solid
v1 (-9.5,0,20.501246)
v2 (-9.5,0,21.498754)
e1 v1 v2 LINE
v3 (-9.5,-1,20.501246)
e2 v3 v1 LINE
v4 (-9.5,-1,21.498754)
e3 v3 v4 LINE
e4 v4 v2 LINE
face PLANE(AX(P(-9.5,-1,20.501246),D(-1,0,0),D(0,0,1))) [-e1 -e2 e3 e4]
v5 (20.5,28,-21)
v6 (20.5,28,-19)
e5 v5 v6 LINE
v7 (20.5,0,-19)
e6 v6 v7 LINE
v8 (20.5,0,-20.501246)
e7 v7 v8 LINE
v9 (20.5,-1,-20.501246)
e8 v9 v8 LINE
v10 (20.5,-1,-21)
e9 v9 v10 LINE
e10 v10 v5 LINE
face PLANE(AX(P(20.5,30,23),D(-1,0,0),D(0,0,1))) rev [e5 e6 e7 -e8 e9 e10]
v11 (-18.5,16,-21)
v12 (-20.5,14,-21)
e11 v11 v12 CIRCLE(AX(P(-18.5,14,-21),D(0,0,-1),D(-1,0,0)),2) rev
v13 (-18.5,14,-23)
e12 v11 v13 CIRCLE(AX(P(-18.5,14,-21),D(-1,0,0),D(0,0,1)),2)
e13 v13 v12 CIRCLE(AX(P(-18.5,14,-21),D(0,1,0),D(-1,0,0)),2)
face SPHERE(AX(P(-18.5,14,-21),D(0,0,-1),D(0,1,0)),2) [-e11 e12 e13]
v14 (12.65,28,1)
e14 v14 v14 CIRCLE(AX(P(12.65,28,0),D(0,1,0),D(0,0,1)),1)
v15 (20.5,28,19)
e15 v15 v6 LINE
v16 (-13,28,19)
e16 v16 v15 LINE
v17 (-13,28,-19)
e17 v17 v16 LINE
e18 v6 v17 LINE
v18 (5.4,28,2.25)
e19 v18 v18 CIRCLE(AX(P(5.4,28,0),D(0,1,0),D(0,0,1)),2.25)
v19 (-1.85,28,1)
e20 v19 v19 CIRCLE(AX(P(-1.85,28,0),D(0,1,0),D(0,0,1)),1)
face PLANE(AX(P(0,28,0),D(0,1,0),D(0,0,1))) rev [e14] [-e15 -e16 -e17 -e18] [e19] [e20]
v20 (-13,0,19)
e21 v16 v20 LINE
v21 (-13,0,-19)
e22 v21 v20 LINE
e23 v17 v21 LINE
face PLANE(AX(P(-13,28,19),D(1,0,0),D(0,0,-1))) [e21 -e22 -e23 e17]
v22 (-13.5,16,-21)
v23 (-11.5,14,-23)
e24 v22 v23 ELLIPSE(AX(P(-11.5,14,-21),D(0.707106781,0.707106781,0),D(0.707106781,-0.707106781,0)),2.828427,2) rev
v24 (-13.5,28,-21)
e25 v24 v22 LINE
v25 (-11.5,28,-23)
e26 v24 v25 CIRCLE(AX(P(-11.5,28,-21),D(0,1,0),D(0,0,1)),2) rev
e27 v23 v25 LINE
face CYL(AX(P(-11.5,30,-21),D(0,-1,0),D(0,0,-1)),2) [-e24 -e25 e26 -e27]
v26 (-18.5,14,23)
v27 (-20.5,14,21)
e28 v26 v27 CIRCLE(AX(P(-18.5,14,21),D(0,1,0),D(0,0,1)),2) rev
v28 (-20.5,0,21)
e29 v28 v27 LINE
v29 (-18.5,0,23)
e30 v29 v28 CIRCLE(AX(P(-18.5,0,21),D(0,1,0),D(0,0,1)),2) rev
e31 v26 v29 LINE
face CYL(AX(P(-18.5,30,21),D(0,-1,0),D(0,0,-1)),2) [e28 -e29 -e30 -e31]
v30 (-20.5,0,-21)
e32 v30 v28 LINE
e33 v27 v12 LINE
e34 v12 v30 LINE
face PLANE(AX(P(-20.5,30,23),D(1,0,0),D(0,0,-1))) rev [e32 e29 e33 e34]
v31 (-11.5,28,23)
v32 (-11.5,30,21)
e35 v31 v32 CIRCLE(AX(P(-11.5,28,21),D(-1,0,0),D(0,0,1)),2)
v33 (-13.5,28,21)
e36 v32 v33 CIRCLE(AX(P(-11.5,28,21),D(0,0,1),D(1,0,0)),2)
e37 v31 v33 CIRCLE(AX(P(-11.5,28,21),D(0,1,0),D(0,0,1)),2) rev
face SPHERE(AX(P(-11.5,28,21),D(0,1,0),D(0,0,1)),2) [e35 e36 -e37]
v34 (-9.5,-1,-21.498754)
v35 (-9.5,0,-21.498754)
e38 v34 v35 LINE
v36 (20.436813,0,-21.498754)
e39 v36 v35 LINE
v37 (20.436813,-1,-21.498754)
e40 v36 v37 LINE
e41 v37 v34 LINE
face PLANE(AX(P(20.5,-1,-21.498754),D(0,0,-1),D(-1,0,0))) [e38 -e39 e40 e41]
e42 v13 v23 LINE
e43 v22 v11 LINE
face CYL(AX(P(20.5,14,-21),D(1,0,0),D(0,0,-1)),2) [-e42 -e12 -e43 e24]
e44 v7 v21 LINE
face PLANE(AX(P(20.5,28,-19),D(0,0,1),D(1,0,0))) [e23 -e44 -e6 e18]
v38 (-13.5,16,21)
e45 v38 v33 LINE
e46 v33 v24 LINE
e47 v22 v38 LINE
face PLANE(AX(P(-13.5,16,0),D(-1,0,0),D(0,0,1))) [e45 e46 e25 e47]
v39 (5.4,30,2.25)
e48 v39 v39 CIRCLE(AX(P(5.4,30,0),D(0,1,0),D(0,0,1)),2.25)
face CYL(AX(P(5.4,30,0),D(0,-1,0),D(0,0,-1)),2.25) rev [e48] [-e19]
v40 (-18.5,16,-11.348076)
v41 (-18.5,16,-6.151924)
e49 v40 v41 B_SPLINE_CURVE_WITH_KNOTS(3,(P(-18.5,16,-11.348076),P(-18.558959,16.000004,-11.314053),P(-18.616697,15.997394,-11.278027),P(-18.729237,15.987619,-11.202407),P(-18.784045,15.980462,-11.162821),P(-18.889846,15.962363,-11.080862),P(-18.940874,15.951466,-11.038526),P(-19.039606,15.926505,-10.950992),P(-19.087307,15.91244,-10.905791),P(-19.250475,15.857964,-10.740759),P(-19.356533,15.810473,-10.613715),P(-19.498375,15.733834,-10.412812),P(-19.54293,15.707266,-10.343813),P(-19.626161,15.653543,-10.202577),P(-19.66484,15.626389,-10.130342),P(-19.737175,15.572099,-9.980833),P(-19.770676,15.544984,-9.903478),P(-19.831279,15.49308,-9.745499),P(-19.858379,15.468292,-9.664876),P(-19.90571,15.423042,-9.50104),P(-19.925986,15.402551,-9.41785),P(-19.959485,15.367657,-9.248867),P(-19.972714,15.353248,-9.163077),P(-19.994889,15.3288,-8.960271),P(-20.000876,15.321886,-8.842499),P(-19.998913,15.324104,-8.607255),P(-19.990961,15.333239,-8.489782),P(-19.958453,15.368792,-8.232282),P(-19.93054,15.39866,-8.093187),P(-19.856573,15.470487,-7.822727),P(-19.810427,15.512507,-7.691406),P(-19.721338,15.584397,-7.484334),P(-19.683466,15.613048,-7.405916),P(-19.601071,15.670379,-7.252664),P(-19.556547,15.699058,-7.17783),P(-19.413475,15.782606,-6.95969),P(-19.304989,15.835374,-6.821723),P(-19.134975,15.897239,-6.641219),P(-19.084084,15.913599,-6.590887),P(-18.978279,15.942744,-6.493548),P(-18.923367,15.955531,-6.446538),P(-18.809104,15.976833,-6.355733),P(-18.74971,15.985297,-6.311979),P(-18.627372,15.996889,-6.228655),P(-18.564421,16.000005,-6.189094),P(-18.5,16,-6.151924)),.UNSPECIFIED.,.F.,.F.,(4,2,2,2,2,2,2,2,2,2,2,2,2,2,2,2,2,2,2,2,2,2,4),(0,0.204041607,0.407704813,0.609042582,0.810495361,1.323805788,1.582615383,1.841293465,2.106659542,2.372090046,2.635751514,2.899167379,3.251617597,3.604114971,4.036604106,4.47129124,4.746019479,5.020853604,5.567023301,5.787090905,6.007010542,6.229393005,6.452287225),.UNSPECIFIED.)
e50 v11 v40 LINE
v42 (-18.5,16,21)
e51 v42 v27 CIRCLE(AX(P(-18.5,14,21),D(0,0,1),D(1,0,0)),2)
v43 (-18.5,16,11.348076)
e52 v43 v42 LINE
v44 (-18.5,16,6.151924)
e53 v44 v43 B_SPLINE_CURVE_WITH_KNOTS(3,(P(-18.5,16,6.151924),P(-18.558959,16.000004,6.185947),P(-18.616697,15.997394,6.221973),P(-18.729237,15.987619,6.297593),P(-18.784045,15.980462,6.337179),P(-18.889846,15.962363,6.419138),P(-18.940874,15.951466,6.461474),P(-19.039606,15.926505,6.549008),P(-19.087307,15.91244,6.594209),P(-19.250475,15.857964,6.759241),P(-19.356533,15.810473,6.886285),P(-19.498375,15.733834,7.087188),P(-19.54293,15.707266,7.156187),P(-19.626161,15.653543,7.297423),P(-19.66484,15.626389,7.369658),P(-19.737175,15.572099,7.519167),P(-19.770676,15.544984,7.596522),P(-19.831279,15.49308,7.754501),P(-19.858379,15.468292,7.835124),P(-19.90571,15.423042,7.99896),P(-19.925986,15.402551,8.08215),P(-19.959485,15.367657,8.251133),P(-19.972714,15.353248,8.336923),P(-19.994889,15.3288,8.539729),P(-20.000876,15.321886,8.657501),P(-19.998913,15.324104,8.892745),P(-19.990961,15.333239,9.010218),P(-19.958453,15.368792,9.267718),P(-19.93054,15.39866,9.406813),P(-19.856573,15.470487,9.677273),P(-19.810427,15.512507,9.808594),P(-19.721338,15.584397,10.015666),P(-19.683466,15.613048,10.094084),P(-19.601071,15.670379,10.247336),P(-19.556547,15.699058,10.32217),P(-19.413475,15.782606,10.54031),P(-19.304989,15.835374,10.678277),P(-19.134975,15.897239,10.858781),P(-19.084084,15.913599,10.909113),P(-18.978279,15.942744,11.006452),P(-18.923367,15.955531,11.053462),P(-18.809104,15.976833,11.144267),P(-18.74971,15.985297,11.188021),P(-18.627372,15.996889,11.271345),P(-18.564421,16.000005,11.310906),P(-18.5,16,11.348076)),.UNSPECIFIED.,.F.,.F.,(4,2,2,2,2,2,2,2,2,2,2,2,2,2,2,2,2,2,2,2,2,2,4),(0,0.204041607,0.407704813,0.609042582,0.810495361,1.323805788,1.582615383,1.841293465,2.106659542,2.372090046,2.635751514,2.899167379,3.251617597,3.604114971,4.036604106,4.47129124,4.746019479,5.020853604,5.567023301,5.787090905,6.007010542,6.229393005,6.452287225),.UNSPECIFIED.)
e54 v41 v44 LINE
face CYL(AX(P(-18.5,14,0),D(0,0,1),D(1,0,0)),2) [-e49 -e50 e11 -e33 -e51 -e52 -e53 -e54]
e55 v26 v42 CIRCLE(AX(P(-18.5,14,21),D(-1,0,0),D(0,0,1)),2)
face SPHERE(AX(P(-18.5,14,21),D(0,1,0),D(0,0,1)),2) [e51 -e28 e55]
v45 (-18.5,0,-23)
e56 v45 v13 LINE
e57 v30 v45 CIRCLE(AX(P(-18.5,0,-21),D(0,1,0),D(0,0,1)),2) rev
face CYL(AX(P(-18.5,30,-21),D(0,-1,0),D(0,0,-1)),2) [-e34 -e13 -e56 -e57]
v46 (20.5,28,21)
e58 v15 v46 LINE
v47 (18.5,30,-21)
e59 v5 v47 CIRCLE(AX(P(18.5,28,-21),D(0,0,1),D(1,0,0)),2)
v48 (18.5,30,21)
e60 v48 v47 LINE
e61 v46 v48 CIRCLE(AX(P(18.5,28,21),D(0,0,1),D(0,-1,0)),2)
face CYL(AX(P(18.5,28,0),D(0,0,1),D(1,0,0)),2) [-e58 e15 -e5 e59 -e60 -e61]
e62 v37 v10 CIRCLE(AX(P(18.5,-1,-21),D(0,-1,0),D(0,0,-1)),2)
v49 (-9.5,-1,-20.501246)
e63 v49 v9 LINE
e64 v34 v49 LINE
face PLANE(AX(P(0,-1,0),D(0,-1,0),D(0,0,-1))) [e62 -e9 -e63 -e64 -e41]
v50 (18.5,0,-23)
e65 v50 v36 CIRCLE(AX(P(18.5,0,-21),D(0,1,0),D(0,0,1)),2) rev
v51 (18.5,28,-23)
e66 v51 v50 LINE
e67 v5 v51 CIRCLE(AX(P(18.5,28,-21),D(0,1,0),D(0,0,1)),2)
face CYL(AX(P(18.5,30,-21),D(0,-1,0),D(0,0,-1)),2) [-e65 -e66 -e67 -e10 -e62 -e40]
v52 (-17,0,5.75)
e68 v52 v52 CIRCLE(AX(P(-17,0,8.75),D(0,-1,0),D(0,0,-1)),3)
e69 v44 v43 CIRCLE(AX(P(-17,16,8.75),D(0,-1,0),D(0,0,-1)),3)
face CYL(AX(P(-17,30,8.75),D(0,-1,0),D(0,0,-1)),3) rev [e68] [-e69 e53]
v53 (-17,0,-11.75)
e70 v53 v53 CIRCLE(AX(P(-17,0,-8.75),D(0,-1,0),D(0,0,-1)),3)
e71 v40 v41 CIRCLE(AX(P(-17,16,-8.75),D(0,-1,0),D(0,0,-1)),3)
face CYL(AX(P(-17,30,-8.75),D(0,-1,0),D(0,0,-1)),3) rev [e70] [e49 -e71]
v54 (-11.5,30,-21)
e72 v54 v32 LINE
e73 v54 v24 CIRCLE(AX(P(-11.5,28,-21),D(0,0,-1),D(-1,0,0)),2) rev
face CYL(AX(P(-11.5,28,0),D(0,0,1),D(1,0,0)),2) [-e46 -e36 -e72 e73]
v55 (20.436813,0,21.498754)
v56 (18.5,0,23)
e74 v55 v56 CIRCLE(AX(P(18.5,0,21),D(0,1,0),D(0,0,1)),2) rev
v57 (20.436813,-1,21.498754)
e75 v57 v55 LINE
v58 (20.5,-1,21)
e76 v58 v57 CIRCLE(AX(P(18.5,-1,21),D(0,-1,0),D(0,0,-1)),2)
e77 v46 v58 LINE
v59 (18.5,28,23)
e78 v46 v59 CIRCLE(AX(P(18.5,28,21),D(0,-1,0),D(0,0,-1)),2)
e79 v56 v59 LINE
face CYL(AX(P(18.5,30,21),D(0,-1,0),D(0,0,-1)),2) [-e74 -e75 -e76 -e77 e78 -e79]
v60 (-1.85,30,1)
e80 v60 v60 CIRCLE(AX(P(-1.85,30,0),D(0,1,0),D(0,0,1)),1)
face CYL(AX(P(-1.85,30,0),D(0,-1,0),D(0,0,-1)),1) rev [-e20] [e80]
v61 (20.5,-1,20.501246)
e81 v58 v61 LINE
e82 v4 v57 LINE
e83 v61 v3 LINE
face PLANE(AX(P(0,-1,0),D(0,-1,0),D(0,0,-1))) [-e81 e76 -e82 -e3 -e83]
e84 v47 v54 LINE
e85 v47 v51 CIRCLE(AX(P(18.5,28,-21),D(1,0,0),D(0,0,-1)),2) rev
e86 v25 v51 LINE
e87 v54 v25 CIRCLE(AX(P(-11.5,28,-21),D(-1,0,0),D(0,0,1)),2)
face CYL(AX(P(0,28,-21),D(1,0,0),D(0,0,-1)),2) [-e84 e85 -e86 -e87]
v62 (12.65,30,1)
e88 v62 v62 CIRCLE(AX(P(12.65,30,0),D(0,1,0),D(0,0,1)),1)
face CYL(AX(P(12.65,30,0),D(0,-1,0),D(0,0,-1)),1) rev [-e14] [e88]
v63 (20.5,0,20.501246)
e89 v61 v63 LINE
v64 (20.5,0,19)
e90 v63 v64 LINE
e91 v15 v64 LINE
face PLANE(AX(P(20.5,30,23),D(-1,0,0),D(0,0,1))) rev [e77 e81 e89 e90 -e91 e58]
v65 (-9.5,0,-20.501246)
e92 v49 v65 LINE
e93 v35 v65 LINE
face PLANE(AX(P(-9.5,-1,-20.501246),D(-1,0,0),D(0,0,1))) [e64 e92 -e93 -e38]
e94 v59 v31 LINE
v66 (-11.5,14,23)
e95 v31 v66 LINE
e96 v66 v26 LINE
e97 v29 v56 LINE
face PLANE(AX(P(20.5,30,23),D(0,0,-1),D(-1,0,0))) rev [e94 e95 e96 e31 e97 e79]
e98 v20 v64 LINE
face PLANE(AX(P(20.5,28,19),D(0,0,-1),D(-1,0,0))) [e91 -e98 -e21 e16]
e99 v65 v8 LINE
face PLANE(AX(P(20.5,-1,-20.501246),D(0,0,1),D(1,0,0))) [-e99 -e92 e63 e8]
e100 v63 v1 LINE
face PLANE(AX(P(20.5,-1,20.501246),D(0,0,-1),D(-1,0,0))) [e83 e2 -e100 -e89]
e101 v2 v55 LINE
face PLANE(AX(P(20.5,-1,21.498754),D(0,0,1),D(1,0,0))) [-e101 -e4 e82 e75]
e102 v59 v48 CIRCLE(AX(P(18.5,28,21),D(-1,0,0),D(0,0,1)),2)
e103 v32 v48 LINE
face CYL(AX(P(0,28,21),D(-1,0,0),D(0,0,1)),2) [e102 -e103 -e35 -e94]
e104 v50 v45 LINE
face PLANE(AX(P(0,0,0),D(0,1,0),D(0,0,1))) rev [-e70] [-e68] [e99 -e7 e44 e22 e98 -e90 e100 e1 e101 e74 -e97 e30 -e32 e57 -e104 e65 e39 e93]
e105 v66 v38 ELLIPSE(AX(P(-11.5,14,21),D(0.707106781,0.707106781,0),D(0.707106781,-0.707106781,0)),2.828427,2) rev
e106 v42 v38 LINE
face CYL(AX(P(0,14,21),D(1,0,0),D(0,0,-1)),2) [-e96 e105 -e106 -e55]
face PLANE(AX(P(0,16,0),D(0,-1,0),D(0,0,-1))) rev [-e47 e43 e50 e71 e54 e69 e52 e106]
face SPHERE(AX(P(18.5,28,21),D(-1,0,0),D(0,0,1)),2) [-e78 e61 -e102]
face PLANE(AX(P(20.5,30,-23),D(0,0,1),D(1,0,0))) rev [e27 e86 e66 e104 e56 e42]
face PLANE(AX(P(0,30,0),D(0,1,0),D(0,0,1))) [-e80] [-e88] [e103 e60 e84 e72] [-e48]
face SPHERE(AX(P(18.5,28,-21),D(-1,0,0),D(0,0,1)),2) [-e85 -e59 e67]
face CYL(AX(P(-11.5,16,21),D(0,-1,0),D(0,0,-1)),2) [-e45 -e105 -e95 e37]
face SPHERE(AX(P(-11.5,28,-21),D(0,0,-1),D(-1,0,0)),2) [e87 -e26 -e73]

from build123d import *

# Parameters (mm, degrees)
ESQUISSE1_W                  = 41
ESQUISSE1_H                  = 46
ESQUISSE1_R                  = 2.25
ESQUISSE1_R_2                = 1
BOSS_EXTRU_1_DEPTH           = 30
ENL_V_START                  = 30
ESQUISSE2_W                  = 7
ESQUISSE2_H                  = 46
ENL_V_MAT_EXTRU_1_DEPTH      = 14
ENL_V_MAT_EXTRU_3_DEPTH      = 28.002906878
ENL_V_MAT_EXTRU_3_DEPTH_BACK = 44.002906878
ENL_V_MAT_EXTRU_3_START      = 16
ESQUISSE2_3_R                = 3
ESQUISSE3_W                  = 33.5
ESQUISSE3_H                  = 38
ENL_V_MAT_EXTRU_4_DEPTH      = 28
ESQUISSE4_W                  = 30
ESQUISSE4_H                  = 0.997507574
BOSS_EXTRU_2_DEPTH           = 1
CONG_1_R                     = 2
CONG_2_R                     = 2


# Some blends are built 0.0001 mm under size
with BuildPart() as part:
    # Esquisse1 → Boss.-Extru.1 (new body)
    with BuildSketch(Plane(origin=(0, 0, 0), x_dir=(1, 0, 0), z_dir=(0, 1, 0))):
        Rectangle(ESQUISSE1_W, ESQUISSE1_H)
        with Locations(Location((5.4, 0, 0), (0, 0, 270))):
            Circle(ESQUISSE1_R, mode=Mode.SUBTRACT)
        with Locations(Location((-1.85, 0, 0), (0, 0, 270))):
            Circle(ESQUISSE1_R_2, mode=Mode.SUBTRACT)
        with Locations(Location((12.65, 0, 0), (0, 0, 270))):
            Circle(ESQUISSE1_R_2, mode=Mode.SUBTRACT)
    extrude(amount=BOSS_EXTRU_1_DEPTH)

    # Esquisse2 → Enlèv. mat.-Extru.1 (cut)
    with BuildSketch(Plane(origin=(0, 0, 0), x_dir=(1, 0, 0), z_dir=(0, 1, 0)).offset(ENL_V_START)):
        with Locations((-17, 0)):
            Rectangle(ESQUISSE2_W, ESQUISSE2_H)
    extrude(amount=-ENL_V_MAT_EXTRU_1_DEPTH, mode=Mode.SUBTRACT)

    # Esquisse2<3> → Enlèv. mat.-Extru.3 (cut, two sides: drawn at the far end of the back side and taken through both)
    with BuildSketch(Plane(origin=(0, 0, 0), x_dir=(1, 0, 0), z_dir=(0, 1, 0)).offset(ENL_V_MAT_EXTRU_3_START - ENL_V_MAT_EXTRU_3_DEPTH_BACK)):
        with Locations(Location((-17, -8.75, 0), (0, 0, 90))):
            Circle(ESQUISSE2_3_R)
        with Locations(Location((-17, 8.75, 0), (0, 0, 90))):
            Circle(ESQUISSE2_3_R)
    extrude(amount=ENL_V_MAT_EXTRU_3_DEPTH + ENL_V_MAT_EXTRU_3_DEPTH_BACK, mode=Mode.SUBTRACT)

    # Esquisse3 → Enlèv. mat.-Extru.4 (cut)
    with BuildSketch(Plane(origin=(0, 0, 0), x_dir=(1, 0, 0), z_dir=(0, 1, 0))):
        with Locations((3.75, 0)):
            Rectangle(ESQUISSE3_W, ESQUISSE3_H)
    extrude(amount=ENL_V_MAT_EXTRU_4_DEPTH, mode=Mode.SUBTRACT)

    # Esquisse4 → Boss.-Extru.2 (add)
    with BuildSketch(Plane(origin=(0, 0, 0), x_dir=(1, 0, 0), z_dir=(0, 1, 0))):
        with Locations((5.5, -21)):
            Rectangle(ESQUISSE4_W, ESQUISSE4_H)
        with Locations((5.5, 21)):
            Rectangle(ESQUISSE4_W, ESQUISSE4_H)
    extrude(amount=-BOSS_EXTRU_2_DEPTH)

    # Congé1
    # the kernel refuses this fillet: 2 mm, written as the material it takes off along each edge
    with BuildSketch(Plane(origin=(-11.5, 28, -21), x_dir=(-1, 0, 0), z_dir=(0, 0, -1))) as cong_1_piece_1_section:
        Polygon((0, 0), (CONG_1_R, 0), (CONG_1_R, CONG_1_R), (0, CONG_1_R), align=None)
    cong_1_piece_1 = extrude(amount=CONG_1_R, mode=Mode.PRIVATE)
    cong_1_piece_1 = cong_1_piece_1 - Plane(origin=(-11.5, 28, -21), x_dir=(0.7071067811865475, -0.7071067811865475, 0), z_dir=(0, 0, -1)) * Sphere(CONG_1_R, mode=Mode.PRIVATE)
    add(cong_1_piece_1, mode=Mode.SUBTRACT)
    with BuildSketch(Plane(origin=(-18.5, 14, -21), x_dir=(0, 1, 0), z_dir=(-1, 0, 0))) as cong_1_piece_2_section:
        Polygon((0, 0), (CONG_1_R, 0), (CONG_1_R, CONG_1_R), (0, CONG_1_R), align=None)
    cong_1_piece_2 = extrude(amount=CONG_1_R, mode=Mode.PRIVATE)
    cong_1_piece_2 = cong_1_piece_2 - Plane(origin=(-18.5, 14, -21), x_dir=(0, -0.7071067811865475, 0.7071067811865475), z_dir=(-1, 0, 0)) * Sphere(CONG_1_R, mode=Mode.PRIVATE)
    add(cong_1_piece_2, mode=Mode.SUBTRACT)
    with BuildSketch(Plane(origin=(-11.5, 28, 21), x_dir=(-1, 0, 0), z_dir=(0, 0, 1))) as cong_1_piece_3_section:
        Polygon((0, 0), (CONG_1_R, 0), (CONG_1_R, -CONG_1_R), (0, -CONG_1_R), align=None)
    cong_1_piece_3 = extrude(amount=CONG_1_R, mode=Mode.PRIVATE)
    cong_1_piece_3 = cong_1_piece_3 - Plane(origin=(-11.5, 28, 21), x_dir=(0.7071067811865475, -0.7071067811865475, 0), z_dir=(0, 0, 1)) * Sphere(CONG_1_R, mode=Mode.PRIVATE)
    add(cong_1_piece_3, mode=Mode.SUBTRACT)
    with BuildSketch(Plane(origin=(-18.5, 14, 21), x_dir=(-1, 0, 0), z_dir=(0, 0, 1))) as cong_1_piece_4_section:
        Polygon((0, 0), (CONG_1_R, 0), (CONG_1_R, -CONG_1_R), (0, -CONG_1_R), align=None)
    cong_1_piece_4 = extrude(amount=CONG_1_R, mode=Mode.PRIVATE)
    cong_1_piece_4 = cong_1_piece_4 - Plane(origin=(-18.5, 14, 21), x_dir=(0.7071067811865475, -0.7071067811865475, 0), z_dir=(0, 0, 1)) * Sphere(CONG_1_R, mode=Mode.PRIVATE)
    add(cong_1_piece_4, mode=Mode.SUBTRACT)
    with BuildSketch(Plane(origin=(-11.5, 30, -23), x_dir=(0, 0, 1), z_dir=(1, 0, 0))) as cong_1_piece_5:
        with BuildLine():
            CenterArc((CONG_1_R, CONG_1_R), CONG_1_R, 180, 90)
            Line((0, CONG_1_R), (0, 0))
            Line((0, 0), (CONG_1_R, 0))
        make_face()
    extrude(amount=37, mode=Mode.SUBTRACT)
    with BuildSketch(Plane(origin=(-20.5, -5, -23), x_dir=(0, 0, 1), z_dir=(0, 1, 0)), Plane(origin=(-20.5, -5, 23), x_dir=(1, 0, 0), z_dir=(0, 1, 0))) as cong_1_piece_6:
        with BuildLine():
            CenterArc((CONG_1_R, CONG_1_R), CONG_1_R, 180, 90)
            Line((0, CONG_1_R), (0, 0))
            Line((0, 0), (CONG_1_R, 0))
        make_face()
    extrude(amount=19, mode=Mode.SUBTRACT)
    with BuildSketch(Plane(origin=(25.5, 30, 23), x_dir=(0, -1, 0), z_dir=(-1, 0, 0))) as cong_1_piece_7:
        with BuildLine():
            CenterArc((CONG_1_R, -CONG_1_R), CONG_1_R, 90, 90)
            Line((0, -CONG_1_R), (0, 0))
            Line((0, 0), (CONG_1_R, 0))
        make_face()
    extrude(amount=37, mode=Mode.SUBTRACT)
    with BuildSketch(Plane(origin=(-13.5, 16, 23), x_dir=(0, -1, 0), z_dir=(-1, 0, 0))) as cong_1_piece_8:
        with BuildLine():
            CenterArc((CONG_1_R, -CONG_1_R), CONG_1_R, 90, 90)
            Line((0, -CONG_1_R), (0, 0))
            Line((0, 0), (CONG_1_R, 0))
        make_face()
    extrude(amount=5, mode=Mode.SUBTRACT)
    with BuildSketch(Plane(origin=(-13.5, 28, 23), x_dir=(1, 0, 0), z_dir=(0, -1, 0)), Plane(origin=(-13.5, 28, -23), x_dir=(0, 0, 1), z_dir=(0, -1, 0))) as cong_1_piece_9:
        with BuildLine():
            CenterArc((CONG_1_R, -CONG_1_R), CONG_1_R, 90, 90)
            Line((0, -CONG_1_R), (0, 0))
            Line((0, 0), (CONG_1_R, 0))
        make_face()
    extrude(amount=12, mode=Mode.SUBTRACT)
    with BuildSketch(Plane(origin=(-20.5, 16, 21), x_dir=(0, -1, 0), z_dir=(0, 0, -1))) as cong_1_piece_10:
        with BuildLine():
            CenterArc((CONG_1_R, -CONG_1_R), CONG_1_R, 90, 90)
            Line((0, -CONG_1_R), (0, 0))
            Line((0, 0), (CONG_1_R, 0))
        make_face()
    extrude(amount=42, mode=Mode.SUBTRACT)
    with BuildSketch(Plane(origin=(-13.5, 30, -21), x_dir=(0, -1, 0), z_dir=(0, 0, 1))) as cong_1_piece_11:
        with BuildLine():
            CenterArc((CONG_1_R, CONG_1_R), CONG_1_R, 180, 90)
            Line((0, CONG_1_R), (0, 0))
            Line((0, 0), (CONG_1_R, 0))
        make_face()
    extrude(amount=42, mode=Mode.SUBTRACT)
    with BuildSketch(Plane(origin=(-18.5, 16, -23), x_dir=(0, 0, 1), z_dir=(1, 0, 0))) as cong_1_piece_12:
        with BuildLine():
            CenterArc((CONG_1_R, CONG_1_R), CONG_1_R, 180, 90)
            Line((0, CONG_1_R), (0, 0))
            Line((0, 0), (CONG_1_R, 0))
        make_face()
    extrude(amount=5, mode=Mode.SUBTRACT)
    with BuildSketch(Plane(origin=(-8.5, 16, 23), x_dir=(0, -1, 0), z_dir=(-1, 0, 0))) as cong_1_piece_13a_section:
        with BuildLine():
            CenterArc((CONG_1_R, -CONG_1_R), CONG_1_R, 90, 90)
            Line((0, -CONG_1_R), (0, 0))
            Line((0, 0), (CONG_1_R, 0))
        make_face()
    cong_1_piece_13a = extrude(amount=10, mode=Mode.PRIVATE)
    cong_1_piece_13a = split(cong_1_piece_13a, bisect_by=Plane(origin=(-13.5, 15.547209771, 22.547209771), z_dir=(1, 0, 0)), keep=Keep.TOP, mode=Mode.PRIVATE)
    with BuildSketch(Plane(origin=(-13.5, 28, 23), x_dir=(1, 0, 0), z_dir=(0, -1, 0))) as cong_1_piece_13b_section:
        with BuildLine():
            CenterArc((CONG_1_R, -CONG_1_R), CONG_1_R, 90, 90)
            Line((0, -CONG_1_R), (0, 0))
            Line((0, 0), (CONG_1_R, 0))
        make_face()
    cong_1_piece_13b = extrude(amount=17, mode=Mode.PRIVATE)
    cong_1_piece_13b = split(cong_1_piece_13b, bisect_by=Plane(origin=(-13.047209771, 16, 22.547209771), z_dir=(0, -1, 0)), keep=Keep.TOP, mode=Mode.PRIVATE)
    cong_1_piece_13 = cong_1_piece_13a & cong_1_piece_13b
    add(cong_1_piece_13, mode=Mode.SUBTRACT)
    with BuildSketch(Plane(origin=(-18.5, 16, -23), x_dir=(0, 0, 1), z_dir=(1, 0, 0))) as cong_1_piece_14a_section:
        with BuildLine():
            CenterArc((CONG_1_R, CONG_1_R), CONG_1_R, 180, 90)
            Line((0, CONG_1_R), (0, 0))
            Line((0, 0), (CONG_1_R, 0))
        make_face()
    cong_1_piece_14a = extrude(amount=10, mode=Mode.PRIVATE)
    cong_1_piece_14a = split(cong_1_piece_14a, bisect_by=Plane(origin=(-13.5, 15.547209771, -22.547209771), z_dir=(1, 0, 0)), keep=Keep.TOP, mode=Mode.PRIVATE)
    with BuildSketch(Plane(origin=(-13.5, 28, -23), x_dir=(0, 0, 1), z_dir=(0, -1, 0))) as cong_1_piece_14b_section:
        with BuildLine():
            CenterArc((CONG_1_R, -CONG_1_R), CONG_1_R, 90, 90)
            Line((0, -CONG_1_R), (0, 0))
            Line((0, 0), (CONG_1_R, 0))
        make_face()
    cong_1_piece_14b = extrude(amount=17, mode=Mode.PRIVATE)
    cong_1_piece_14b = split(cong_1_piece_14b, bisect_by=Plane(origin=(-13.047209771, 16, -22.547209771), z_dir=(0, -1, 0)), keep=Keep.TOP, mode=Mode.PRIVATE)
    cong_1_piece_14 = cong_1_piece_14a & cong_1_piece_14b
    add(cong_1_piece_14, mode=Mode.SUBTRACT)

    # Congé2
    cong_2_edges = [part.edges().sort_by_distance(p)[0] for p in [
        (20.5, 14, 23),
        (20.5, 29.414213562, 22.414213562),
        (20.5, 14, -23),
        (20.5, 29.414213562, -22.414213562),
        (20.5, 30, 0),
    ]]
    fillet(cong_2_edges, radius=CONG_2_R - 0.0001)  # a hair under: the kernel refuses the full size


solid = part.part
